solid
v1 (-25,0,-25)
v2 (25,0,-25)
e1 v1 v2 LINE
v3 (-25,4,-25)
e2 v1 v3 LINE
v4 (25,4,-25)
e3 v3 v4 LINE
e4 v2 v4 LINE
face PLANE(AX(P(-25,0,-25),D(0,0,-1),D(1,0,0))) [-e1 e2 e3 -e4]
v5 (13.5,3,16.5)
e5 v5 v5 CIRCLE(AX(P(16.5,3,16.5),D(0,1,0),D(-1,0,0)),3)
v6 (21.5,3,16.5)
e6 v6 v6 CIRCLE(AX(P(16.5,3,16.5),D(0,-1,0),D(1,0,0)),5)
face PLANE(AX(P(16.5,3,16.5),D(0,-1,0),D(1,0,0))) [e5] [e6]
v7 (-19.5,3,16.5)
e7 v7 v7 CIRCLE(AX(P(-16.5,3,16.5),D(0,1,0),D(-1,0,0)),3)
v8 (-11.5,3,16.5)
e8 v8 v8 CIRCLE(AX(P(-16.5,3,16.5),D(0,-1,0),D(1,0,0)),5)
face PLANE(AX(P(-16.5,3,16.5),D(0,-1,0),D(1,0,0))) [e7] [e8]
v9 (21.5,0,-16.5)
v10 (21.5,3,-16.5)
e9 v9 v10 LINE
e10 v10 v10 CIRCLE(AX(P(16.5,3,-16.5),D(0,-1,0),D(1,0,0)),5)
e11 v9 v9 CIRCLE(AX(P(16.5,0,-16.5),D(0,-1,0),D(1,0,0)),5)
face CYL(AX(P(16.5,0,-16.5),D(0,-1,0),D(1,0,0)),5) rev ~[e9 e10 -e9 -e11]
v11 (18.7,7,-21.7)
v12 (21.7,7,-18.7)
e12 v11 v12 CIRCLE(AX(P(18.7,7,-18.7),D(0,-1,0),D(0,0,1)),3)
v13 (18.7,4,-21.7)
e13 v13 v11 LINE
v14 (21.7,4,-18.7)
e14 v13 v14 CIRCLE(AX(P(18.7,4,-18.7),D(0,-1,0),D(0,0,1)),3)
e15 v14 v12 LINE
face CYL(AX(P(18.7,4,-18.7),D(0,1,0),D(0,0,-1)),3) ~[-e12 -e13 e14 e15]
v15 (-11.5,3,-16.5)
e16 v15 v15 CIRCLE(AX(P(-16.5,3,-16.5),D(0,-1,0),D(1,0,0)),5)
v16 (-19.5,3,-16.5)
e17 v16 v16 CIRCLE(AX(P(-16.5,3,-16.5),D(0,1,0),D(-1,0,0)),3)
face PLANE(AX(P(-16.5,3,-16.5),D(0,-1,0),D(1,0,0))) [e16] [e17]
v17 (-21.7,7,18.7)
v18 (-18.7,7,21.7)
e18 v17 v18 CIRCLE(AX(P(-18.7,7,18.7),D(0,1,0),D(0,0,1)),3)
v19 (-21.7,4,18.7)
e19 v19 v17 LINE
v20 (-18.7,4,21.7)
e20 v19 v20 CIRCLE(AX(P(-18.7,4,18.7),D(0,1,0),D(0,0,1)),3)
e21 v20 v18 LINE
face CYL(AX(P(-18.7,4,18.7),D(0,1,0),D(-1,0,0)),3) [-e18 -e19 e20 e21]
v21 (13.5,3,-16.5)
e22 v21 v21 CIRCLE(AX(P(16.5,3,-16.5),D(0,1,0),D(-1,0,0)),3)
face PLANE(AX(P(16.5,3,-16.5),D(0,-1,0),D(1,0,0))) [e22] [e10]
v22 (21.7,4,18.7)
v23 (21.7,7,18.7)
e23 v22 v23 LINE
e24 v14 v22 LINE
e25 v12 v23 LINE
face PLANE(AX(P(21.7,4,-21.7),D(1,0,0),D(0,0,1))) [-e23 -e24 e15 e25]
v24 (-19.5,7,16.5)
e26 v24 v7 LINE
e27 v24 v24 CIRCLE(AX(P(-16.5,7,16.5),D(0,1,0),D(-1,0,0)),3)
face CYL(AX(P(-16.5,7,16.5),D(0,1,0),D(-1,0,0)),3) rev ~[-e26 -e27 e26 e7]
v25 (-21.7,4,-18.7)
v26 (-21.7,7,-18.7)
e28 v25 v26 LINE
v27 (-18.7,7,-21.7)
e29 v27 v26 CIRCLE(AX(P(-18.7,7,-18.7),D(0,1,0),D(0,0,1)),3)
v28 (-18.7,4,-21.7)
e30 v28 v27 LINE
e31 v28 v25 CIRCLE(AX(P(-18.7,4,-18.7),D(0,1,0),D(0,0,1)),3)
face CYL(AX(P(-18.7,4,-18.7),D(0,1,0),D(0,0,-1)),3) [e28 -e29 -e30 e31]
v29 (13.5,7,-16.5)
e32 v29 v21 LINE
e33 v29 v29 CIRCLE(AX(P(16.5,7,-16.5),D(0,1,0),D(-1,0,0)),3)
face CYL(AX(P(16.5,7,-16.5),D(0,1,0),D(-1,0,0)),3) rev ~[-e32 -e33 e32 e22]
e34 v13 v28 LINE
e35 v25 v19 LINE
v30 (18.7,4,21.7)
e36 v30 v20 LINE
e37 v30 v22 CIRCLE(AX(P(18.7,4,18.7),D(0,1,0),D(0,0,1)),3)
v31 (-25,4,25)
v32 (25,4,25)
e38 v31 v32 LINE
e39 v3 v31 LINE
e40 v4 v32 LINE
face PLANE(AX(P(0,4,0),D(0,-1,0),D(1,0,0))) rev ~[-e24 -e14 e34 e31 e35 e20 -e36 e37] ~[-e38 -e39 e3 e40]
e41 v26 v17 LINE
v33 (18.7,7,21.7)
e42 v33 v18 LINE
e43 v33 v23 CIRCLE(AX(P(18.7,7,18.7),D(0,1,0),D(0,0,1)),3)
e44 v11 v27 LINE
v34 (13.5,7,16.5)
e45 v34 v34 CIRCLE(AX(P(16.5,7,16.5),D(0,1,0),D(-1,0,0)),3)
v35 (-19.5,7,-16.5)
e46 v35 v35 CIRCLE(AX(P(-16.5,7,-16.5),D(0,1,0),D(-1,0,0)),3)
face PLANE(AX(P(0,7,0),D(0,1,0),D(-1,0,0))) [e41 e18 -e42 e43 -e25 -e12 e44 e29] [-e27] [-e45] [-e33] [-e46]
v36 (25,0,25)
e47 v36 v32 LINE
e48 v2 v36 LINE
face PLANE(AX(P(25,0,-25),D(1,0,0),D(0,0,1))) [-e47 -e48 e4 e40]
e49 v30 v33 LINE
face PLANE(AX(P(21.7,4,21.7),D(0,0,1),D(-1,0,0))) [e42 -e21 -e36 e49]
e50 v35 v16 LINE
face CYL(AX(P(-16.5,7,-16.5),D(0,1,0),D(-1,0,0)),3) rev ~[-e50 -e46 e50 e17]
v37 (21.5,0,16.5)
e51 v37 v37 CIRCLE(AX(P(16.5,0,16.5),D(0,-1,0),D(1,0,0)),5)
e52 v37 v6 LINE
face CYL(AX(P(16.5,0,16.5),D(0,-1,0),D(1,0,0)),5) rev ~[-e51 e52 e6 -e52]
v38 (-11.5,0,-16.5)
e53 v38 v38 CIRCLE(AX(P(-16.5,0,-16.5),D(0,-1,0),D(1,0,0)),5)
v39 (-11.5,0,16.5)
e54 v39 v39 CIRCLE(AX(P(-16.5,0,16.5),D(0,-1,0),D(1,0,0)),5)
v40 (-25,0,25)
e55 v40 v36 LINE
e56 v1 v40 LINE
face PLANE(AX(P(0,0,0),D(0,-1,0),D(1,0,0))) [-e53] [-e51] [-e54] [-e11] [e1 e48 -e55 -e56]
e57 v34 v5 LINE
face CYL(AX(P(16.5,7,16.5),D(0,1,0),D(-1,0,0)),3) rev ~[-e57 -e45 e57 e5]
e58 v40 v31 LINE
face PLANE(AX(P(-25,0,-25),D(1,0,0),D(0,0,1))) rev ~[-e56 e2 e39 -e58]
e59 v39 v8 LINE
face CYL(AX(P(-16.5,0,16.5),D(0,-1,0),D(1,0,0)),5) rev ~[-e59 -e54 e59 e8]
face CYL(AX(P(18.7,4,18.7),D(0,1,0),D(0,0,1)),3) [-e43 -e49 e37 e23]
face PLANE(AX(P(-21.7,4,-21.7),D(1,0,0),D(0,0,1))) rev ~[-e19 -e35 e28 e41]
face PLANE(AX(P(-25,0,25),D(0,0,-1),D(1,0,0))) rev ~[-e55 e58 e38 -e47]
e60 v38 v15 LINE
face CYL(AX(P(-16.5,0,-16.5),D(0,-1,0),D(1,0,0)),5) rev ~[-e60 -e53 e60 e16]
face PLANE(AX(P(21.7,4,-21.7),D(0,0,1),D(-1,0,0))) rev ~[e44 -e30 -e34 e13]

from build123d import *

# Parameters (mm, degrees)
F0_W     = 50
F0_H     = 50
F1_DEPTH = 4
F2_W     = 43.4
F2_H     = 43.4
F3_DEPTH = 3
F4_R     = 3
F5_DEPTH = 25
F6_R     = 5
F6_R_2   = 3
F7_DEPTH = 3
F8_R     = 3


# Not quite as in the source:
# - a feature names something its author has since deleted; it is built from what else it names


with BuildPart() as f1:
    # F0 (on Front) → F1 (new body)
    with BuildSketch(Plane.XZ):
        Rectangle(F0_W, F0_H)
    extrude(amount=-F1_DEPTH)

    # F2 (on face) → F3 (join)
    with BuildSketch(Plane(origin=(0, 4, 0), x_dir=(-1, 0, 0), z_dir=(0, 1, 0))):
        Rectangle(F2_W, F2_H)
    extrude(amount=F3_DEPTH)

    # F4 (on face) → F5 (cut)
    with BuildSketch(Plane(origin=(0, 7, 0), x_dir=(-1, 0, 0), z_dir=(0, 1, 0))):
        with Locations((-16.5, 16.5)):
            Circle(F4_R)
        with Locations((16.5, 16.5)):
            Circle(F4_R)
        with Locations((16.5, -16.5)):
            Circle(F4_R)
        with Locations((-16.5, -16.5)):
            Circle(F4_R)
    extrude(amount=-F5_DEPTH, mode=Mode.SUBTRACT)

    # F6 (on face) → F7 (cut)
    with BuildSketch(Plane.XZ):
        with Locations((-16.5, 16.5)):
            Circle(F6_R)
        with Locations((-16.5, 16.5)):
            Circle(F6_R_2, mode=Mode.SUBTRACT)
        with Locations((16.5, 16.5)):
            Circle(F6_R)
        with Locations((16.5, 16.5)):
            Circle(F6_R_2, mode=Mode.SUBTRACT)
        with Locations((16.5, -16.5)):
            Circle(F6_R)
        with Locations((16.5, -16.5)):
            Circle(F6_R_2, mode=Mode.SUBTRACT)
        with Locations((-16.5, -16.5)):
            Circle(F6_R)
        with Locations((-16.5, -16.5)):
            Circle(F6_R_2, mode=Mode.SUBTRACT)
    extrude(amount=-F7_DEPTH, mode=Mode.SUBTRACT)

    # F8
    f8_edges = [f1.edges().sort_by_distance(p)[0] for p in [
        (21.7, 5.5, 21.7),
        (-21.7, 5.5, 21.7),
        (-21.7, 5.5, -21.7),
        (21.7, 5.5, -21.7),
    ]]
    fillet(f8_edges, radius=F8_R)


solid = f1.part
